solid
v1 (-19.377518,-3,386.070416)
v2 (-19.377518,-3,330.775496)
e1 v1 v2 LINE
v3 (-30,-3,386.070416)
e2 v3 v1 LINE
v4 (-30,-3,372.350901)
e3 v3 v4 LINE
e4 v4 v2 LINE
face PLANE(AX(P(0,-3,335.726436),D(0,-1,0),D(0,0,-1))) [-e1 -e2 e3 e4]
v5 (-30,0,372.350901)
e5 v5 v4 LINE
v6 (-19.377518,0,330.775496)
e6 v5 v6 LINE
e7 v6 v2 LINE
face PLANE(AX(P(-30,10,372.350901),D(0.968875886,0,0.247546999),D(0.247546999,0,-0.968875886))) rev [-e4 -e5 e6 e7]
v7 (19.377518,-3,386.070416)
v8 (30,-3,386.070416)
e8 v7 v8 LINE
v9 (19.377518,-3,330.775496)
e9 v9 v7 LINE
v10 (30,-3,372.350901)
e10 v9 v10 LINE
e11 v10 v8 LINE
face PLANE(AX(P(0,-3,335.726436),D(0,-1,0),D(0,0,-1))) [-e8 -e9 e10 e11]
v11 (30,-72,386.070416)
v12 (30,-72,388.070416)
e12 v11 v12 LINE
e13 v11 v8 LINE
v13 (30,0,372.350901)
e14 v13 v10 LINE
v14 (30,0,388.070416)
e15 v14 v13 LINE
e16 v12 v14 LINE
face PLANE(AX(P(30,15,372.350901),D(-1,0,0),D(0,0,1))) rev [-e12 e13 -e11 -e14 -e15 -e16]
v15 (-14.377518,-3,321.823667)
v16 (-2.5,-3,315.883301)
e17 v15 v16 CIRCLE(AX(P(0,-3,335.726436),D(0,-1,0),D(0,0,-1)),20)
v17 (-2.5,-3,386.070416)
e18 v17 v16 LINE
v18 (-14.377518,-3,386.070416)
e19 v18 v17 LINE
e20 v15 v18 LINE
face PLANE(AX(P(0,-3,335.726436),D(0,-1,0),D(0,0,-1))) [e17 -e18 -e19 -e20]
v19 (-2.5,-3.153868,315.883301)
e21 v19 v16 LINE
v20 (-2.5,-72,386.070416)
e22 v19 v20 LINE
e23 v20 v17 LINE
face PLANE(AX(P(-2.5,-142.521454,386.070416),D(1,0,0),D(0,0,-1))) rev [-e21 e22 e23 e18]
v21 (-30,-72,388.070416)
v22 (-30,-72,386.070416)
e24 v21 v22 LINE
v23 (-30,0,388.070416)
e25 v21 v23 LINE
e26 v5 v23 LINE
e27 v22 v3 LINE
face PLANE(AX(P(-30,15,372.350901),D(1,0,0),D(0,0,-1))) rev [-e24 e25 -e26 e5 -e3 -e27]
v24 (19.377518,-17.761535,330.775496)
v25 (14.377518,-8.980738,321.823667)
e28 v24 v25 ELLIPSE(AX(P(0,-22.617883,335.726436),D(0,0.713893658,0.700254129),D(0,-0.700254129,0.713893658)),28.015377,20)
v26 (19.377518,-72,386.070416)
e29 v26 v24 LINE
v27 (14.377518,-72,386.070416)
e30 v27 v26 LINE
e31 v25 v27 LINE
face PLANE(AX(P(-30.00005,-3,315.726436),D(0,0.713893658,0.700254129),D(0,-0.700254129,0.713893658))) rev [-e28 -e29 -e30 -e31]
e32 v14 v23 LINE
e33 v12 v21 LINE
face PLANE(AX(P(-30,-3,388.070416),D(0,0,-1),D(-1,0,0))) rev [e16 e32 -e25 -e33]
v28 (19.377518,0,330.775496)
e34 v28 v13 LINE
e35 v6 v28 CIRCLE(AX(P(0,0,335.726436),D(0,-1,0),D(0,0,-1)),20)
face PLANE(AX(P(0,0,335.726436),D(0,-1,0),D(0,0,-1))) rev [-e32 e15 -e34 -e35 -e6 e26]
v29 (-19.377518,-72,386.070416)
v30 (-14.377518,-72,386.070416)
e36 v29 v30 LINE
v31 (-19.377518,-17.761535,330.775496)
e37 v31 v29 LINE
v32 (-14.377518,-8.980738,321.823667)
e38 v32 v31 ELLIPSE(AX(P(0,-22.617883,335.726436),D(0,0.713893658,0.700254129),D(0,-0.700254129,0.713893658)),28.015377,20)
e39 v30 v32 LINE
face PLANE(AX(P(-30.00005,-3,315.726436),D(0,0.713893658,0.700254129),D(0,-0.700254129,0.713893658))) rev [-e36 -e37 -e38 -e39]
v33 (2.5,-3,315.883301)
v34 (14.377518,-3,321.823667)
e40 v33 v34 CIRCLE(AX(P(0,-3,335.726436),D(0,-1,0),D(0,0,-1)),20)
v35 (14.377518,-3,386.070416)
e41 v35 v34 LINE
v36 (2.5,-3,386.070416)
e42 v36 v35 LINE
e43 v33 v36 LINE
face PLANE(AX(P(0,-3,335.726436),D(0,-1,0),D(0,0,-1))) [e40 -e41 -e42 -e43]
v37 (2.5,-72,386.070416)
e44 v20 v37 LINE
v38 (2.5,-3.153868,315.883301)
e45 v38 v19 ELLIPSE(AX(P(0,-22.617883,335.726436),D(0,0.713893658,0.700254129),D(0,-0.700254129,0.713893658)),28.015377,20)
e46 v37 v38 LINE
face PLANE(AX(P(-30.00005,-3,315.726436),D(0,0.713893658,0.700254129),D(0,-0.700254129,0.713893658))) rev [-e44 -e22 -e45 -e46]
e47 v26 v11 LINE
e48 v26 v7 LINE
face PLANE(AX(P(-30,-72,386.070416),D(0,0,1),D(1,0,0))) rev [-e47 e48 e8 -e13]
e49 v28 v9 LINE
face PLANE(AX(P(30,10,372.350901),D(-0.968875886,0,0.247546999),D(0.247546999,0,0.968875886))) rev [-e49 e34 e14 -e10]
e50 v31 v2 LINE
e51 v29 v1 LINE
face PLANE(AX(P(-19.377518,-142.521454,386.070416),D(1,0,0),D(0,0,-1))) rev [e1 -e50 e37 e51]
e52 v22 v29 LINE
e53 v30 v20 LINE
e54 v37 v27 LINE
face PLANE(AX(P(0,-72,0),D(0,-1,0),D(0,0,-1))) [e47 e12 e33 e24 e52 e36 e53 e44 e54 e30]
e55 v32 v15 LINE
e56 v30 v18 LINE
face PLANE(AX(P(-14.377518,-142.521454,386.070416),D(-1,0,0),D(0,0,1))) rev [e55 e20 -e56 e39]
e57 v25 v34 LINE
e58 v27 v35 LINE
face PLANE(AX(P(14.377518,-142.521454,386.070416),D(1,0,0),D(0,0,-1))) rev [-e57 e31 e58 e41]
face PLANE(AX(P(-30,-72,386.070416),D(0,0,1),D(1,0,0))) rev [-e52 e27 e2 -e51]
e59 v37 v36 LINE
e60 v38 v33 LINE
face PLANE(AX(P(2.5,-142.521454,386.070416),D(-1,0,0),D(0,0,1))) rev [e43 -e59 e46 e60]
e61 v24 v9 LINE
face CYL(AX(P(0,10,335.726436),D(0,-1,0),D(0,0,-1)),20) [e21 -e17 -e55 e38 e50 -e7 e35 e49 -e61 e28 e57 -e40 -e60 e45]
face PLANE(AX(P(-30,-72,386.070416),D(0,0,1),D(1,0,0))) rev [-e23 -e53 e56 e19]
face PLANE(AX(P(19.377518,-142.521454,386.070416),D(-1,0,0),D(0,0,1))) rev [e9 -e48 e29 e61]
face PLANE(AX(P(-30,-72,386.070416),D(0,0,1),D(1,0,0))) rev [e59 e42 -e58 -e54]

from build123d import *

# Parameters (mm, degrees)
BOSS_EXTRUDE1_DEPTH     = 15
BOSS_EXTRUDE2_DEPTH     = 10
SKETCH3_R               = 3.25
CUT_EXTRUDE1_DEPTH      = 9
CUT_EXTRUDE2_START      = -7
SKETCH4_R               = 6
CUT_EXTRUDE2_DEPTH      = 7
CHAMFER1_START          = 3
CHAMFER1_2_DEPTH        = 7
CHAMFER1_3_OUTLINE_R    = 12
CHAMFER1_3_OUTLINE_R_2  = 6
CHAMFER1_3_DEPTH        = 7
CHAMFER2_SIZE           = 5
CHAMFER2_SIZE2          = 3
SKETCH5_W               = 22
SKETCH5_H               = 32.792874394
CUT_EXTRUDE3_DEPTH      = 12
FILLET1_R               = 10
FILLET2_R               = 10
BOSS_EXTRUDE3_START     = 3
BOSS_EXTRUDE3_DEPTH     = 3
SKETCH7_W               = 60
SKETCH7_H               = 2
BOSS_EXTRUDE4_DEPTH     = 69
SKETCH8_W               = 60
SKETCH8_H               = 92.343979927
CUT_EXTRUDE4_DEPTH      = 416.45813754
BOSS_EXTRUDE5_START     = 69
BOSS_EXTRUDE5_DEPTH     = 69
CUT_EXTRUDE5_DEPTH      = 396.831589728
CUT_EXTRUDE5_DEPTH_BACK = 396.831589728


with BuildPart() as part:
    # Sketch1 → Boss-Extrude1 (new body)
    with BuildSketch(Plane(origin=(0, 0, 0), x_dir=(1, 0, 0), z_dir=(0, 1, 0))):
        with BuildLine():
            Line((-30, -408.070415552), (30, -408.070415552))
            Line((30, -408.070415552), (30, -372.350901436))
            ThreePointArc((30, -372.350901436), (0, -375.726435625), (-30, -372.350901436))
            Line((-30, -372.350901436), (-30, -408.070415552))
        make_face()
        with BuildLine():
            Line((-21, -395.210658494), (-21, -385.210658494))
            ThreePointArc((-21, -385.210658494), (-23, -383.210658494), (-25, -385.210658494))
            Line((-25, -385.210658494), (-25, -395.210658494))
            ThreePointArc((-25, -395.210658494), (-23, -397.210658494), (-21, -395.210658494))
        make_face(mode=Mode.SUBTRACT)
        with BuildLine():
            Line((25, -385.210658494), (25, -395.210658494))
            ThreePointArc((25, -395.210658494), (23, -397.210658494), (21, -395.210658494))
            Line((21, -395.210658494), (21, -385.210658494))
            ThreePointArc((21, -385.210658494), (23, -383.210658494), (25, -385.210658494))
        make_face(mode=Mode.SUBTRACT)
    extrude(amount=BOSS_EXTRUDE1_DEPTH)

    # Sketch2 → Boss-Extrude2 (add)
    with BuildSketch(Plane(origin=(0, 0, 0), x_dir=(1, 0, 0), z_dir=(0, 1, 0))):
        with BuildLine():
            Line((30, -372.350901436), (19.377517729, -330.775495649))
            ThreePointArc((19.377517729, -330.775495649), (0, -315.726435625), (-19.377517729, -330.775495649))
            Line((-19.377517729, -330.775495649), (-30, -372.350901436))
            ThreePointArc((-30, -372.350901436), (0, -375.726435625), (30, -372.350901436))
        make_face()
    extrude(amount=BOSS_EXTRUDE2_DEPTH)

    # Sketch3 → Cut-Extrude1 (cut)
    with BuildSketch(Plane(origin=(0, 10, 0), x_dir=(1, 0, 0), z_dir=(0, 1, 0))):
        with Locations(Location((0, -335.726435625, 0), (0, 0, 270))):
            Circle(SKETCH3_R)
    extrude(amount=-CUT_EXTRUDE1_DEPTH, mode=Mode.SUBTRACT)

    # Sketch4 → Cut-Extrude2 (cut)
    with BuildSketch(Plane(origin=(0, 10, 0), x_dir=(1, 0, 0), z_dir=(0, 1, 0)).offset(CUT_EXTRUDE2_START)):
        with BuildLine():
            Line((30, -372.350901436), (19.377517729, -330.775495649))
            ThreePointArc((19.377517729, -330.775495649), (0, -315.726435625), (-19.377517729, -330.775495649))
            Line((-19.377517729, -330.775495649), (-30, -372.350901436))
            ThreePointArc((-30, -372.350901436), (0, -375.726435625), (30, -372.350901436))
        make_face()
        with Locations(Location((0, -335.726435625, 0), (0, 0, 270))):
            Circle(SKETCH4_R, mode=Mode.SUBTRACT)
    extrude(amount=CUT_EXTRUDE2_DEPTH, mode=Mode.SUBTRACT)

    # Chamfer1: read off the stored shape, not the designer's step
    # Chamfer1 outline → Chamfer1 (revolve)
    with BuildSketch(Plane.XY.offset(335.726435625)):
        Polygon((26, 3), (12, 10), (12, 3), align=None)
    revolve(axis=Axis((0, 0, 335.726435625), (0, 1, 0)))

    # Chamfer1 2 outline → Chamfer1 2 (cut)
    with BuildSketch(Plane(origin=(0, 0, 0), x_dir=(1, 0, 0), z_dir=(0, 1, 0)).offset(CHAMFER1_START)):
        with BuildLine():
            ThreePointArc((-19.377517729, -330.775495649), (0, -315.726435625), (19.377517729, -330.775495649))
            Line((19.377517729, -330.775495649), (24.033863727, -349))
            Line((24.033863727, -349), (27, -349))
            Line((27, -349), (27, -308))
            Line((27, -308), (-27, -308))
            Line((-27, -308), (-27, -349))
            Line((-27, -349), (-24.033863727, -349))
            Line((-24.033863727, -349), (-19.377517729, -330.775495649))
        make_face()
    extrude(amount=CHAMFER1_2_DEPTH, mode=Mode.SUBTRACT)

    # Chamfer1 3 outline → Chamfer1 3 (add)
    with BuildSketch(Plane(origin=(0, 0, 0), x_dir=(1, 0, 0), z_dir=(0, 1, 0)).offset(CHAMFER1_START)):
        with Locations((0, -335.726435625)):
            Circle(CHAMFER1_3_OUTLINE_R)
        with Locations((0, -335.726435625)):
            Circle(CHAMFER1_3_OUTLINE_R_2, mode=Mode.SUBTRACT)
    extrude(amount=CHAMFER1_3_DEPTH)

    # Chamfer2
    chamfer2_edges = [part.edges().sort_by_distance(p)[0] for p in [
        (0, 10, 332.476435625),
    ]]
    chamfer2_side = [part.faces().sort_by_distance(p)[0] for p in [
        (-11.660588745, 10, 335.726435625),
    ]]
    chamfer(chamfer2_edges, length=CHAMFER2_SIZE, length2=CHAMFER2_SIZE2, reference=chamfer2_side[0])

    # Sketch5 → Cut-Extrude3 (cut)
    with BuildSketch(Plane(origin=(0, 15, 0), x_dir=(1, 0, 0), z_dir=(0, 1, 0))):
        with Locations((0, -391.673978355)):
            Rectangle(SKETCH5_W, SKETCH5_H)
    extrude(amount=-CUT_EXTRUDE3_DEPTH, mode=Mode.SUBTRACT)

    # Fillet1
    fillet1_edges = [part.edges().sort_by_distance(p)[0] for p in [
        (-11, 9, 375.277541158),
        (11, 9, 375.277541158),
    ]]
    fillet(fillet1_edges, radius=FILLET1_R)

    # Fillet2
    fillet2_edges = [part.edges().sort_by_distance(p)[0] for p in [
        (30, 7.5, 408.070415552),
        (-30, 7.5, 408.070415552),
    ]]
    fillet(fillet2_edges, radius=FILLET2_R)

    # Sketch6 → Boss-Extrude3 (add)
    with BuildSketch(Plane.XZ.offset(BOSS_EXTRUDE3_START)):
        with BuildLine():
            Line((-30, 388.070415552), (30, 388.070415552))
            Line((30, 388.070415552), (30, 372.350901436))
            Line((30, 372.350901436), (19.377517729, 330.775495649))
            ThreePointArc((19.377517729, 330.775495649), (0, 315.726435625), (-19.377517729, 330.775495649))
            Line((-19.377517729, 330.775495649), (-30, 372.350901436))
            Line((-30, 372.350901436), (-30, 388.070415552))
        make_face()
    extrude(amount=-BOSS_EXTRUDE3_DEPTH)

    # Sketch7 → Boss-Extrude4 (add)
    with BuildSketch(Plane.XZ.offset(3)):
        with Locations((0, 387.070415552)):
            Rectangle(SKETCH7_W, SKETCH7_H)
    extrude(amount=BOSS_EXTRUDE4_DEPTH)

    # Sketch8 → Cut-Extrude4 (cut, through all)
    with BuildSketch(Plane(origin=(0, 0, 0), x_dir=(1, 0, 0), z_dir=(0, 1, 0))):
        with Locations((0, -361.898425589)):
            Rectangle(SKETCH8_W, SKETCH8_H)
    extrude(amount=CUT_EXTRUDE4_DEPTH, mode=Mode.SUBTRACT)

    # Sketch9 → Boss-Extrude5 (add)
    with BuildSketch(Plane.XZ.offset(3).offset(BOSS_EXTRUDE5_START)):
        with BuildLine():
            Line((-2.5, 386.070415552), (2.5, 386.070415552))
            Line((2.5, 386.070415552), (2.5, 315.883300792))
            ThreePointArc((2.5, 315.883300792), (0, 315.726435625), (-2.5, 315.883300792))
            Line((-2.5, 315.883300792), (-2.5, 386.070415552))
        make_face()
        with BuildLine():
            Line((14.377517729, 386.070415552), (19.377517729, 386.070415552))
            Line((19.377517729, 386.070415552), (19.377517729, 330.775495649))
            ThreePointArc((19.377517729, 330.775495649), (17.460939697, 325.973713704), (14.377517729, 321.823666695))
            Line((14.377517729, 321.823666695), (14.377517729, 386.070415552))
        make_face()
        with BuildLine():
            Line((-19.377517729, 386.070415552), (-19.377517729, 330.775495649))
            ThreePointArc((-19.377517729, 330.775495649), (-17.460939697, 325.973713704), (-14.377517729, 321.823666695))
            Line((-14.377517729, 321.823666695), (-14.377517729, 386.070415552))
            Line((-14.377517729, 386.070415552), (-19.377517729, 386.070415552))
        make_face()
    extrude(amount=-BOSS_EXTRUDE5_DEPTH)

    # Sketch10 → Cut-Extrude5 (cut, two sides: drawn at the far end of the back side and taken through both)
    with BuildSketch(Plane(origin=(0, 0, 0), x_dir=(0, 0, -1), z_dir=(1, 0, 0)).offset(-CUT_EXTRUDE5_DEPTH_BACK)):
        Polygon((-386.070415552, -72), (-315.726435625, -72), (-315.726435625, -3), align=None)
    extrude(amount=CUT_EXTRUDE5_DEPTH + CUT_EXTRUDE5_DEPTH_BACK, mode=Mode.SUBTRACT)


solid = part.part
